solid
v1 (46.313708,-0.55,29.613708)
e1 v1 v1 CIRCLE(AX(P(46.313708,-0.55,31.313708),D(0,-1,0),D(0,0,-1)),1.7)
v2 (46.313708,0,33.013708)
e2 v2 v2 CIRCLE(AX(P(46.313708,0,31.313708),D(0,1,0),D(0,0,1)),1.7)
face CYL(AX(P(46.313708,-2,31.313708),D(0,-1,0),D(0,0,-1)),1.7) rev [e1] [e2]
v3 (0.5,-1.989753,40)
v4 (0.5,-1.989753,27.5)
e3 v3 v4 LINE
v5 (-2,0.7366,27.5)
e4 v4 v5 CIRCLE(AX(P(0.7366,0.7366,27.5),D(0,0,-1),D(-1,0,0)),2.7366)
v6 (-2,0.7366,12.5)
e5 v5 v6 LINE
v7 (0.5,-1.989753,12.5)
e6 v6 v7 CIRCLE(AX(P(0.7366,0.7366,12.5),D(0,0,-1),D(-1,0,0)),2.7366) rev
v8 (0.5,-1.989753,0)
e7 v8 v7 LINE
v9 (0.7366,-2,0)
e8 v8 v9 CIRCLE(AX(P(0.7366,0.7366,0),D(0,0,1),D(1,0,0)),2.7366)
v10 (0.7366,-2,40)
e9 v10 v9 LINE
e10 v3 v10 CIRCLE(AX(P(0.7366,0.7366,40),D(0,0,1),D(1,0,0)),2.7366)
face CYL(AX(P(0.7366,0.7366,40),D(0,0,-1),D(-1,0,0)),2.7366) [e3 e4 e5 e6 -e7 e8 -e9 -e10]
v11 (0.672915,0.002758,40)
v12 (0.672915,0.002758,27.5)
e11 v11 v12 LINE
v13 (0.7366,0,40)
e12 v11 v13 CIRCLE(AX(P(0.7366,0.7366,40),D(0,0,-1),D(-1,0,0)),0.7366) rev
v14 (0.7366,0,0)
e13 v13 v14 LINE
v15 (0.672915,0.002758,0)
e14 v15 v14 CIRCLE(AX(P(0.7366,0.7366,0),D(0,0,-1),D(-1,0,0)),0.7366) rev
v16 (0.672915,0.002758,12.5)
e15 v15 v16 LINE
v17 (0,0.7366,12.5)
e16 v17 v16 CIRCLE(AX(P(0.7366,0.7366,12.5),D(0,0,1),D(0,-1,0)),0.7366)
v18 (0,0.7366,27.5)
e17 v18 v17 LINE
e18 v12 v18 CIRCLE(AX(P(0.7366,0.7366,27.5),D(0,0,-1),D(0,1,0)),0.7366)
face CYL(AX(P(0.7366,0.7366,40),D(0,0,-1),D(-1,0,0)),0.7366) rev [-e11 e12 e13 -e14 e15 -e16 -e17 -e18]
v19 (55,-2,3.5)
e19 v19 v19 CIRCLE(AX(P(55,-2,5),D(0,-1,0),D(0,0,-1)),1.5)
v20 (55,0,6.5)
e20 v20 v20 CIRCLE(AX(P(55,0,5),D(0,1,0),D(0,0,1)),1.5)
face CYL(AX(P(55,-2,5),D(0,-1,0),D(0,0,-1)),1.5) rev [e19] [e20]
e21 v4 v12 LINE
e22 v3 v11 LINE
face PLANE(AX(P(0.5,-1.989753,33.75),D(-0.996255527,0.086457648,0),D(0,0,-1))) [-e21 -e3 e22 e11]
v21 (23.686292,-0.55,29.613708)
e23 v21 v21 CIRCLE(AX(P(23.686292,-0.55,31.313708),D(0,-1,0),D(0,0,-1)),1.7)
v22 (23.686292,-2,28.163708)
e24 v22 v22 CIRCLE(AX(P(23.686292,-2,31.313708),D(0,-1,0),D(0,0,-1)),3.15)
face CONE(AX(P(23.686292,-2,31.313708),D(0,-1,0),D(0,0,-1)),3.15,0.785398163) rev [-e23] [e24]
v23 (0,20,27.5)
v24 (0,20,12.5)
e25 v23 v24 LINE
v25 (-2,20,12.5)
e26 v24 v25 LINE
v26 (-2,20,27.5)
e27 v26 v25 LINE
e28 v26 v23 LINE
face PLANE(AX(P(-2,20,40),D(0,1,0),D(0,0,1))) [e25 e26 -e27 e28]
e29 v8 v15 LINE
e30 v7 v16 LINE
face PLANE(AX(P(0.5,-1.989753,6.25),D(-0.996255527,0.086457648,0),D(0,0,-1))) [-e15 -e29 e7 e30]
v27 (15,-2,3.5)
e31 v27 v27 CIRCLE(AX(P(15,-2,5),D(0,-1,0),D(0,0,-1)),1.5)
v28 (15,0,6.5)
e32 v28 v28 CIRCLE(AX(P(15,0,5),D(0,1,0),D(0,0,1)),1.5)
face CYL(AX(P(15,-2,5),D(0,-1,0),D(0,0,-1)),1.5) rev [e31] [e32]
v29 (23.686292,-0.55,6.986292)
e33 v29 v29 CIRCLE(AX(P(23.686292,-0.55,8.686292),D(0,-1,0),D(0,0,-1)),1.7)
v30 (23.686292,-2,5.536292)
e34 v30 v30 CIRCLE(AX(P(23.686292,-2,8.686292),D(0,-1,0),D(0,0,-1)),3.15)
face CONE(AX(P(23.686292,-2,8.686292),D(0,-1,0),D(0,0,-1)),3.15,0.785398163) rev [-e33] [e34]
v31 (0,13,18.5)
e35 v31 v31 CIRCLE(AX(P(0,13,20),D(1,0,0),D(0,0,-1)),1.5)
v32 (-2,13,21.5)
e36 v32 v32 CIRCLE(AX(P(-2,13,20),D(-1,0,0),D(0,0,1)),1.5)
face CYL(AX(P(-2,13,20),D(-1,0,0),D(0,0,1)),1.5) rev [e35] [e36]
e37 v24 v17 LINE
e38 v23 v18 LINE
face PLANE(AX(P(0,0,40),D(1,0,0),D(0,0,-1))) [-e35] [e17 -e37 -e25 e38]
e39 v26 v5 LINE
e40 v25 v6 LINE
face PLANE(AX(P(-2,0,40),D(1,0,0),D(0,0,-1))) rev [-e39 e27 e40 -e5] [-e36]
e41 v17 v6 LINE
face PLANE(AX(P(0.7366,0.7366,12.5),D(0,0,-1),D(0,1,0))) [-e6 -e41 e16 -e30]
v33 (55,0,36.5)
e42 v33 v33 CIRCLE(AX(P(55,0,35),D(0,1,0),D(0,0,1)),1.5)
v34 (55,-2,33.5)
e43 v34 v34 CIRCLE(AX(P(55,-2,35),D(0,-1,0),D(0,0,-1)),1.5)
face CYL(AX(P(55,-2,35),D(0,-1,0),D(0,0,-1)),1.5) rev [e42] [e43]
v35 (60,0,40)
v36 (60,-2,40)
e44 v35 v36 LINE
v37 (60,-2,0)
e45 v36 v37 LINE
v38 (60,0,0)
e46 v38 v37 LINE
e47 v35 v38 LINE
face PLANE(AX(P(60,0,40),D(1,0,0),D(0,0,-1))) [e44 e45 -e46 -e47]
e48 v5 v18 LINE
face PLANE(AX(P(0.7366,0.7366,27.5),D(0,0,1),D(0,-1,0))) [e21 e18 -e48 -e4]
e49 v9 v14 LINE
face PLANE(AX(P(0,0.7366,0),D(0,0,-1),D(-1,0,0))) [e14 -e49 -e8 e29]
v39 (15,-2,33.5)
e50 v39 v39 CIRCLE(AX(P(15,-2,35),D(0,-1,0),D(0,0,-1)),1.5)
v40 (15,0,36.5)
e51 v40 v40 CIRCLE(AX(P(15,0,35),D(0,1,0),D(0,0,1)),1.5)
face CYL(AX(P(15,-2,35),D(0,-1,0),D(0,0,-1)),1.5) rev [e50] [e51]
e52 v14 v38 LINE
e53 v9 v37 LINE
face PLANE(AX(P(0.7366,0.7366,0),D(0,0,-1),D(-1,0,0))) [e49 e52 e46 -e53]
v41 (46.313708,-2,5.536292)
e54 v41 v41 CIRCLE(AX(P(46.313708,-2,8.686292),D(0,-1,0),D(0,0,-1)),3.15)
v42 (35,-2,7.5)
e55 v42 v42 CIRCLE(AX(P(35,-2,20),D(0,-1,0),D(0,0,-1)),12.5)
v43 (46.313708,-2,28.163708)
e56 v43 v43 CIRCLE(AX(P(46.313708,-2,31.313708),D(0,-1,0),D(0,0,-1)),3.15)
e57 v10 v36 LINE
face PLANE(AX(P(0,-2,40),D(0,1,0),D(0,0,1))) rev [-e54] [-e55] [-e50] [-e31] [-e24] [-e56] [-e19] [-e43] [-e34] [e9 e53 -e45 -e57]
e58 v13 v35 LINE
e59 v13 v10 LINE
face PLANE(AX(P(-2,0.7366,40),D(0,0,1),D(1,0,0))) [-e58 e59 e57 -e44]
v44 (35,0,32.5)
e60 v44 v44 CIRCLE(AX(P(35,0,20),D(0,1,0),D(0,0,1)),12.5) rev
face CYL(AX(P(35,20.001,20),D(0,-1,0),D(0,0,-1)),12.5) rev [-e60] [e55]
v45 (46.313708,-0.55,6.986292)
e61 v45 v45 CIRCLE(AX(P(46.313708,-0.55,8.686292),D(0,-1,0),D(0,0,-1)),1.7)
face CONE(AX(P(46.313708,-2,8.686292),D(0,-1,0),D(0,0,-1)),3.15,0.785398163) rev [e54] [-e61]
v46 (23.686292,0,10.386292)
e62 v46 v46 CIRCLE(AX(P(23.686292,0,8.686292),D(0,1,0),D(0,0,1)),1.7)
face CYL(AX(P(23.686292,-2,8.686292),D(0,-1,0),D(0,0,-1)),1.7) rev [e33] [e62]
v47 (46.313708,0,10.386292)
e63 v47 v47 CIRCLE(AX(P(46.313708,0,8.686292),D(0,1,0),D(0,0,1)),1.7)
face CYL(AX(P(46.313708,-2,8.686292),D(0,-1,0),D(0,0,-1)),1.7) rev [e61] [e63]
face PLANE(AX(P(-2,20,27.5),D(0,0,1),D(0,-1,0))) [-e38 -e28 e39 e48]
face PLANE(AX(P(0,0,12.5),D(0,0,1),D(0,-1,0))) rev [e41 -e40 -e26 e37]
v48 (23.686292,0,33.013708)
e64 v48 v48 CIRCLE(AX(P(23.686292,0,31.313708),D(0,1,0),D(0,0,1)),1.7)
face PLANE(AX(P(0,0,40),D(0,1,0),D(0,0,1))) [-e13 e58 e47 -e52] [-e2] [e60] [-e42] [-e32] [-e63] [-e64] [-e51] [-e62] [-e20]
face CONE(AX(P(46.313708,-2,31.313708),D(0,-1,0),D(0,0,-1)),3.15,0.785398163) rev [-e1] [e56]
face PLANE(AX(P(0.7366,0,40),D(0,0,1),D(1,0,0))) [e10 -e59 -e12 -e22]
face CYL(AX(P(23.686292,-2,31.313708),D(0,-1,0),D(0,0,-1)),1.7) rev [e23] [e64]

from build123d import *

# Parameters (mm, degrees)
SM_BASE_FLANGE_1_DEPTH       = 40
CUT_EXTRUDE_1_REACH          = 77.392
SKETCH_6_R                   = 12.5
HOLE_WIZARD_M3_2_D           = 3
HOLE_WIZARD_M3_4_D           = 3
HOLE_WIZARD_M3_1_D           = 3.4
HOLE_WIZARD_M3_1_CSINK_D     = 6.3
HOLE_WIZARD_M3_1_CSINK_ANGLE = 90
CUT_EXTRUDE_2_DEPTH          = 12.5
CUT_EXTRUDE_START            = 27.5
CUT_EXTRUDE_2_2_DEPTH        = 12.5


# Read off the part's stored shape, not the designer's step: 除料-伸長2
# Sheet-metal steps are written as plain solids
with BuildPart() as part:
    # Sketch 1 → 基材-凸緣1 (new body)
    with BuildSketch(Plane.XY):
        with BuildLine():
            Line((0, 20), (0, 0.7366))
            ThreePointArc((0, 0.7366), (0.215745145, 0.215745145), (0.7366, 0))
            Line((0.7366, 0), (60, 0))
            Line((60, 0), (60, -2))
            Line((60, -2), (0.7366, -2))
            ThreePointArc((0.7366, -2), (-1.198468417, -1.198468417), (-2, 0.7366))
            Line((-2, 0.7366), (-2, 20))
            Line((-2, 20), (0, 20))
        make_face()
    extrude(amount=SM_BASE_FLANGE_1_DEPTH)

    # 草圖6 → 除料-伸長1 (cut, up to next)
    with BuildSketch(Plane(origin=(0, -2, 0), x_dir=(-1, 0, 0), z_dir=(0, -1, 0)), mode=Mode.PRIVATE) as cut_extrude_1_sk1:
        with Locations(Location((-35, -20, 0), (0, 0, 90))):
            Circle(SKETCH_6_R)
    cut_extrude_1_tool1 = extrude(cut_extrude_1_sk1.sketch, amount=-CUT_EXTRUDE_1_REACH, mode=Mode.PRIVATE) & part.part
    add(cut_extrude_1_tool1.solids().sort_by_distance((35, -2, 20))[0], mode=Mode.SUBTRACT)

    # M3 螺紋孔2 (through all)
    with Locations(Plane.ZY.offset(2)):
        with Locations((20, 13)):
            Hole(HOLE_WIZARD_M3_2_D / 2)

    # M3 螺紋孔4 (through all)
    with Locations(Plane(origin=(0, -2, 0), x_dir=(-1, 0, 0), z_dir=(0, -1, 0))):
        with Locations((-15, -5), (-55, -5), (-55, -35), (-15, -35)):
            Hole(HOLE_WIZARD_M3_4_D / 2)

    # M3 平錐坑頭螺釘的錐孔1 (through all)
    with Locations(Plane(origin=(0, -2, 0), x_dir=(-1, 0, 0), z_dir=(0, -1, 0))):
        with Locations((-46.313708499, -8.686291501), (-46.313708499, -31.313708499), (-23.686291501, -31.313708499), (-23.686291501, -8.686291501)):
            CounterSinkHole(HOLE_WIZARD_M3_1_D / 2, HOLE_WIZARD_M3_1_CSINK_D / 2, counter_sink_angle=HOLE_WIZARD_M3_1_CSINK_ANGLE)

    # 除料-伸長2 outline → 除料-伸長2 (cut)
    with BuildSketch(Plane.XY):
        with BuildLine():
            Line((0.5, -1.989752875), (0.672915296, 0.002758179))
            ThreePointArc((0.672915296, 0.002758179), (0.193695905, 0.238770005), (0, 0.7366))
            Line((0, 0.7366), (0, 20))
            Line((0, 20), (-2, 20))
            Line((-2, 20), (-2, 0.7366))
            ThreePointArc((-2, 0.7366), (-1.280385265, -1.112926966), (0.5, -1.989752875))
        make_face()
    extrude(amount=CUT_EXTRUDE_2_DEPTH, mode=Mode.SUBTRACT)

    # Cut-Extrude 2 2 outline → Cut-Extrude 2 2 (cut)
    with BuildSketch(Plane.XY.offset(CUT_EXTRUDE_START)):
        with BuildLine():
            Line((0.5, -1.989752875), (0.672915296, 0.002758179))
            ThreePointArc((0.672915296, 0.002758179), (0.193695905, 0.238770005), (0, 0.7366))
            Line((0, 0.7366), (0, 20))
            Line((0, 20), (-2, 20))
            Line((-2, 20), (-2, 0.7366))
            ThreePointArc((-2, 0.7366), (-1.280385265, -1.112926966), (0.5, -1.989752875))
        make_face()
    extrude(amount=CUT_EXTRUDE_2_2_DEPTH, mode=Mode.SUBTRACT)


solid = part.part
